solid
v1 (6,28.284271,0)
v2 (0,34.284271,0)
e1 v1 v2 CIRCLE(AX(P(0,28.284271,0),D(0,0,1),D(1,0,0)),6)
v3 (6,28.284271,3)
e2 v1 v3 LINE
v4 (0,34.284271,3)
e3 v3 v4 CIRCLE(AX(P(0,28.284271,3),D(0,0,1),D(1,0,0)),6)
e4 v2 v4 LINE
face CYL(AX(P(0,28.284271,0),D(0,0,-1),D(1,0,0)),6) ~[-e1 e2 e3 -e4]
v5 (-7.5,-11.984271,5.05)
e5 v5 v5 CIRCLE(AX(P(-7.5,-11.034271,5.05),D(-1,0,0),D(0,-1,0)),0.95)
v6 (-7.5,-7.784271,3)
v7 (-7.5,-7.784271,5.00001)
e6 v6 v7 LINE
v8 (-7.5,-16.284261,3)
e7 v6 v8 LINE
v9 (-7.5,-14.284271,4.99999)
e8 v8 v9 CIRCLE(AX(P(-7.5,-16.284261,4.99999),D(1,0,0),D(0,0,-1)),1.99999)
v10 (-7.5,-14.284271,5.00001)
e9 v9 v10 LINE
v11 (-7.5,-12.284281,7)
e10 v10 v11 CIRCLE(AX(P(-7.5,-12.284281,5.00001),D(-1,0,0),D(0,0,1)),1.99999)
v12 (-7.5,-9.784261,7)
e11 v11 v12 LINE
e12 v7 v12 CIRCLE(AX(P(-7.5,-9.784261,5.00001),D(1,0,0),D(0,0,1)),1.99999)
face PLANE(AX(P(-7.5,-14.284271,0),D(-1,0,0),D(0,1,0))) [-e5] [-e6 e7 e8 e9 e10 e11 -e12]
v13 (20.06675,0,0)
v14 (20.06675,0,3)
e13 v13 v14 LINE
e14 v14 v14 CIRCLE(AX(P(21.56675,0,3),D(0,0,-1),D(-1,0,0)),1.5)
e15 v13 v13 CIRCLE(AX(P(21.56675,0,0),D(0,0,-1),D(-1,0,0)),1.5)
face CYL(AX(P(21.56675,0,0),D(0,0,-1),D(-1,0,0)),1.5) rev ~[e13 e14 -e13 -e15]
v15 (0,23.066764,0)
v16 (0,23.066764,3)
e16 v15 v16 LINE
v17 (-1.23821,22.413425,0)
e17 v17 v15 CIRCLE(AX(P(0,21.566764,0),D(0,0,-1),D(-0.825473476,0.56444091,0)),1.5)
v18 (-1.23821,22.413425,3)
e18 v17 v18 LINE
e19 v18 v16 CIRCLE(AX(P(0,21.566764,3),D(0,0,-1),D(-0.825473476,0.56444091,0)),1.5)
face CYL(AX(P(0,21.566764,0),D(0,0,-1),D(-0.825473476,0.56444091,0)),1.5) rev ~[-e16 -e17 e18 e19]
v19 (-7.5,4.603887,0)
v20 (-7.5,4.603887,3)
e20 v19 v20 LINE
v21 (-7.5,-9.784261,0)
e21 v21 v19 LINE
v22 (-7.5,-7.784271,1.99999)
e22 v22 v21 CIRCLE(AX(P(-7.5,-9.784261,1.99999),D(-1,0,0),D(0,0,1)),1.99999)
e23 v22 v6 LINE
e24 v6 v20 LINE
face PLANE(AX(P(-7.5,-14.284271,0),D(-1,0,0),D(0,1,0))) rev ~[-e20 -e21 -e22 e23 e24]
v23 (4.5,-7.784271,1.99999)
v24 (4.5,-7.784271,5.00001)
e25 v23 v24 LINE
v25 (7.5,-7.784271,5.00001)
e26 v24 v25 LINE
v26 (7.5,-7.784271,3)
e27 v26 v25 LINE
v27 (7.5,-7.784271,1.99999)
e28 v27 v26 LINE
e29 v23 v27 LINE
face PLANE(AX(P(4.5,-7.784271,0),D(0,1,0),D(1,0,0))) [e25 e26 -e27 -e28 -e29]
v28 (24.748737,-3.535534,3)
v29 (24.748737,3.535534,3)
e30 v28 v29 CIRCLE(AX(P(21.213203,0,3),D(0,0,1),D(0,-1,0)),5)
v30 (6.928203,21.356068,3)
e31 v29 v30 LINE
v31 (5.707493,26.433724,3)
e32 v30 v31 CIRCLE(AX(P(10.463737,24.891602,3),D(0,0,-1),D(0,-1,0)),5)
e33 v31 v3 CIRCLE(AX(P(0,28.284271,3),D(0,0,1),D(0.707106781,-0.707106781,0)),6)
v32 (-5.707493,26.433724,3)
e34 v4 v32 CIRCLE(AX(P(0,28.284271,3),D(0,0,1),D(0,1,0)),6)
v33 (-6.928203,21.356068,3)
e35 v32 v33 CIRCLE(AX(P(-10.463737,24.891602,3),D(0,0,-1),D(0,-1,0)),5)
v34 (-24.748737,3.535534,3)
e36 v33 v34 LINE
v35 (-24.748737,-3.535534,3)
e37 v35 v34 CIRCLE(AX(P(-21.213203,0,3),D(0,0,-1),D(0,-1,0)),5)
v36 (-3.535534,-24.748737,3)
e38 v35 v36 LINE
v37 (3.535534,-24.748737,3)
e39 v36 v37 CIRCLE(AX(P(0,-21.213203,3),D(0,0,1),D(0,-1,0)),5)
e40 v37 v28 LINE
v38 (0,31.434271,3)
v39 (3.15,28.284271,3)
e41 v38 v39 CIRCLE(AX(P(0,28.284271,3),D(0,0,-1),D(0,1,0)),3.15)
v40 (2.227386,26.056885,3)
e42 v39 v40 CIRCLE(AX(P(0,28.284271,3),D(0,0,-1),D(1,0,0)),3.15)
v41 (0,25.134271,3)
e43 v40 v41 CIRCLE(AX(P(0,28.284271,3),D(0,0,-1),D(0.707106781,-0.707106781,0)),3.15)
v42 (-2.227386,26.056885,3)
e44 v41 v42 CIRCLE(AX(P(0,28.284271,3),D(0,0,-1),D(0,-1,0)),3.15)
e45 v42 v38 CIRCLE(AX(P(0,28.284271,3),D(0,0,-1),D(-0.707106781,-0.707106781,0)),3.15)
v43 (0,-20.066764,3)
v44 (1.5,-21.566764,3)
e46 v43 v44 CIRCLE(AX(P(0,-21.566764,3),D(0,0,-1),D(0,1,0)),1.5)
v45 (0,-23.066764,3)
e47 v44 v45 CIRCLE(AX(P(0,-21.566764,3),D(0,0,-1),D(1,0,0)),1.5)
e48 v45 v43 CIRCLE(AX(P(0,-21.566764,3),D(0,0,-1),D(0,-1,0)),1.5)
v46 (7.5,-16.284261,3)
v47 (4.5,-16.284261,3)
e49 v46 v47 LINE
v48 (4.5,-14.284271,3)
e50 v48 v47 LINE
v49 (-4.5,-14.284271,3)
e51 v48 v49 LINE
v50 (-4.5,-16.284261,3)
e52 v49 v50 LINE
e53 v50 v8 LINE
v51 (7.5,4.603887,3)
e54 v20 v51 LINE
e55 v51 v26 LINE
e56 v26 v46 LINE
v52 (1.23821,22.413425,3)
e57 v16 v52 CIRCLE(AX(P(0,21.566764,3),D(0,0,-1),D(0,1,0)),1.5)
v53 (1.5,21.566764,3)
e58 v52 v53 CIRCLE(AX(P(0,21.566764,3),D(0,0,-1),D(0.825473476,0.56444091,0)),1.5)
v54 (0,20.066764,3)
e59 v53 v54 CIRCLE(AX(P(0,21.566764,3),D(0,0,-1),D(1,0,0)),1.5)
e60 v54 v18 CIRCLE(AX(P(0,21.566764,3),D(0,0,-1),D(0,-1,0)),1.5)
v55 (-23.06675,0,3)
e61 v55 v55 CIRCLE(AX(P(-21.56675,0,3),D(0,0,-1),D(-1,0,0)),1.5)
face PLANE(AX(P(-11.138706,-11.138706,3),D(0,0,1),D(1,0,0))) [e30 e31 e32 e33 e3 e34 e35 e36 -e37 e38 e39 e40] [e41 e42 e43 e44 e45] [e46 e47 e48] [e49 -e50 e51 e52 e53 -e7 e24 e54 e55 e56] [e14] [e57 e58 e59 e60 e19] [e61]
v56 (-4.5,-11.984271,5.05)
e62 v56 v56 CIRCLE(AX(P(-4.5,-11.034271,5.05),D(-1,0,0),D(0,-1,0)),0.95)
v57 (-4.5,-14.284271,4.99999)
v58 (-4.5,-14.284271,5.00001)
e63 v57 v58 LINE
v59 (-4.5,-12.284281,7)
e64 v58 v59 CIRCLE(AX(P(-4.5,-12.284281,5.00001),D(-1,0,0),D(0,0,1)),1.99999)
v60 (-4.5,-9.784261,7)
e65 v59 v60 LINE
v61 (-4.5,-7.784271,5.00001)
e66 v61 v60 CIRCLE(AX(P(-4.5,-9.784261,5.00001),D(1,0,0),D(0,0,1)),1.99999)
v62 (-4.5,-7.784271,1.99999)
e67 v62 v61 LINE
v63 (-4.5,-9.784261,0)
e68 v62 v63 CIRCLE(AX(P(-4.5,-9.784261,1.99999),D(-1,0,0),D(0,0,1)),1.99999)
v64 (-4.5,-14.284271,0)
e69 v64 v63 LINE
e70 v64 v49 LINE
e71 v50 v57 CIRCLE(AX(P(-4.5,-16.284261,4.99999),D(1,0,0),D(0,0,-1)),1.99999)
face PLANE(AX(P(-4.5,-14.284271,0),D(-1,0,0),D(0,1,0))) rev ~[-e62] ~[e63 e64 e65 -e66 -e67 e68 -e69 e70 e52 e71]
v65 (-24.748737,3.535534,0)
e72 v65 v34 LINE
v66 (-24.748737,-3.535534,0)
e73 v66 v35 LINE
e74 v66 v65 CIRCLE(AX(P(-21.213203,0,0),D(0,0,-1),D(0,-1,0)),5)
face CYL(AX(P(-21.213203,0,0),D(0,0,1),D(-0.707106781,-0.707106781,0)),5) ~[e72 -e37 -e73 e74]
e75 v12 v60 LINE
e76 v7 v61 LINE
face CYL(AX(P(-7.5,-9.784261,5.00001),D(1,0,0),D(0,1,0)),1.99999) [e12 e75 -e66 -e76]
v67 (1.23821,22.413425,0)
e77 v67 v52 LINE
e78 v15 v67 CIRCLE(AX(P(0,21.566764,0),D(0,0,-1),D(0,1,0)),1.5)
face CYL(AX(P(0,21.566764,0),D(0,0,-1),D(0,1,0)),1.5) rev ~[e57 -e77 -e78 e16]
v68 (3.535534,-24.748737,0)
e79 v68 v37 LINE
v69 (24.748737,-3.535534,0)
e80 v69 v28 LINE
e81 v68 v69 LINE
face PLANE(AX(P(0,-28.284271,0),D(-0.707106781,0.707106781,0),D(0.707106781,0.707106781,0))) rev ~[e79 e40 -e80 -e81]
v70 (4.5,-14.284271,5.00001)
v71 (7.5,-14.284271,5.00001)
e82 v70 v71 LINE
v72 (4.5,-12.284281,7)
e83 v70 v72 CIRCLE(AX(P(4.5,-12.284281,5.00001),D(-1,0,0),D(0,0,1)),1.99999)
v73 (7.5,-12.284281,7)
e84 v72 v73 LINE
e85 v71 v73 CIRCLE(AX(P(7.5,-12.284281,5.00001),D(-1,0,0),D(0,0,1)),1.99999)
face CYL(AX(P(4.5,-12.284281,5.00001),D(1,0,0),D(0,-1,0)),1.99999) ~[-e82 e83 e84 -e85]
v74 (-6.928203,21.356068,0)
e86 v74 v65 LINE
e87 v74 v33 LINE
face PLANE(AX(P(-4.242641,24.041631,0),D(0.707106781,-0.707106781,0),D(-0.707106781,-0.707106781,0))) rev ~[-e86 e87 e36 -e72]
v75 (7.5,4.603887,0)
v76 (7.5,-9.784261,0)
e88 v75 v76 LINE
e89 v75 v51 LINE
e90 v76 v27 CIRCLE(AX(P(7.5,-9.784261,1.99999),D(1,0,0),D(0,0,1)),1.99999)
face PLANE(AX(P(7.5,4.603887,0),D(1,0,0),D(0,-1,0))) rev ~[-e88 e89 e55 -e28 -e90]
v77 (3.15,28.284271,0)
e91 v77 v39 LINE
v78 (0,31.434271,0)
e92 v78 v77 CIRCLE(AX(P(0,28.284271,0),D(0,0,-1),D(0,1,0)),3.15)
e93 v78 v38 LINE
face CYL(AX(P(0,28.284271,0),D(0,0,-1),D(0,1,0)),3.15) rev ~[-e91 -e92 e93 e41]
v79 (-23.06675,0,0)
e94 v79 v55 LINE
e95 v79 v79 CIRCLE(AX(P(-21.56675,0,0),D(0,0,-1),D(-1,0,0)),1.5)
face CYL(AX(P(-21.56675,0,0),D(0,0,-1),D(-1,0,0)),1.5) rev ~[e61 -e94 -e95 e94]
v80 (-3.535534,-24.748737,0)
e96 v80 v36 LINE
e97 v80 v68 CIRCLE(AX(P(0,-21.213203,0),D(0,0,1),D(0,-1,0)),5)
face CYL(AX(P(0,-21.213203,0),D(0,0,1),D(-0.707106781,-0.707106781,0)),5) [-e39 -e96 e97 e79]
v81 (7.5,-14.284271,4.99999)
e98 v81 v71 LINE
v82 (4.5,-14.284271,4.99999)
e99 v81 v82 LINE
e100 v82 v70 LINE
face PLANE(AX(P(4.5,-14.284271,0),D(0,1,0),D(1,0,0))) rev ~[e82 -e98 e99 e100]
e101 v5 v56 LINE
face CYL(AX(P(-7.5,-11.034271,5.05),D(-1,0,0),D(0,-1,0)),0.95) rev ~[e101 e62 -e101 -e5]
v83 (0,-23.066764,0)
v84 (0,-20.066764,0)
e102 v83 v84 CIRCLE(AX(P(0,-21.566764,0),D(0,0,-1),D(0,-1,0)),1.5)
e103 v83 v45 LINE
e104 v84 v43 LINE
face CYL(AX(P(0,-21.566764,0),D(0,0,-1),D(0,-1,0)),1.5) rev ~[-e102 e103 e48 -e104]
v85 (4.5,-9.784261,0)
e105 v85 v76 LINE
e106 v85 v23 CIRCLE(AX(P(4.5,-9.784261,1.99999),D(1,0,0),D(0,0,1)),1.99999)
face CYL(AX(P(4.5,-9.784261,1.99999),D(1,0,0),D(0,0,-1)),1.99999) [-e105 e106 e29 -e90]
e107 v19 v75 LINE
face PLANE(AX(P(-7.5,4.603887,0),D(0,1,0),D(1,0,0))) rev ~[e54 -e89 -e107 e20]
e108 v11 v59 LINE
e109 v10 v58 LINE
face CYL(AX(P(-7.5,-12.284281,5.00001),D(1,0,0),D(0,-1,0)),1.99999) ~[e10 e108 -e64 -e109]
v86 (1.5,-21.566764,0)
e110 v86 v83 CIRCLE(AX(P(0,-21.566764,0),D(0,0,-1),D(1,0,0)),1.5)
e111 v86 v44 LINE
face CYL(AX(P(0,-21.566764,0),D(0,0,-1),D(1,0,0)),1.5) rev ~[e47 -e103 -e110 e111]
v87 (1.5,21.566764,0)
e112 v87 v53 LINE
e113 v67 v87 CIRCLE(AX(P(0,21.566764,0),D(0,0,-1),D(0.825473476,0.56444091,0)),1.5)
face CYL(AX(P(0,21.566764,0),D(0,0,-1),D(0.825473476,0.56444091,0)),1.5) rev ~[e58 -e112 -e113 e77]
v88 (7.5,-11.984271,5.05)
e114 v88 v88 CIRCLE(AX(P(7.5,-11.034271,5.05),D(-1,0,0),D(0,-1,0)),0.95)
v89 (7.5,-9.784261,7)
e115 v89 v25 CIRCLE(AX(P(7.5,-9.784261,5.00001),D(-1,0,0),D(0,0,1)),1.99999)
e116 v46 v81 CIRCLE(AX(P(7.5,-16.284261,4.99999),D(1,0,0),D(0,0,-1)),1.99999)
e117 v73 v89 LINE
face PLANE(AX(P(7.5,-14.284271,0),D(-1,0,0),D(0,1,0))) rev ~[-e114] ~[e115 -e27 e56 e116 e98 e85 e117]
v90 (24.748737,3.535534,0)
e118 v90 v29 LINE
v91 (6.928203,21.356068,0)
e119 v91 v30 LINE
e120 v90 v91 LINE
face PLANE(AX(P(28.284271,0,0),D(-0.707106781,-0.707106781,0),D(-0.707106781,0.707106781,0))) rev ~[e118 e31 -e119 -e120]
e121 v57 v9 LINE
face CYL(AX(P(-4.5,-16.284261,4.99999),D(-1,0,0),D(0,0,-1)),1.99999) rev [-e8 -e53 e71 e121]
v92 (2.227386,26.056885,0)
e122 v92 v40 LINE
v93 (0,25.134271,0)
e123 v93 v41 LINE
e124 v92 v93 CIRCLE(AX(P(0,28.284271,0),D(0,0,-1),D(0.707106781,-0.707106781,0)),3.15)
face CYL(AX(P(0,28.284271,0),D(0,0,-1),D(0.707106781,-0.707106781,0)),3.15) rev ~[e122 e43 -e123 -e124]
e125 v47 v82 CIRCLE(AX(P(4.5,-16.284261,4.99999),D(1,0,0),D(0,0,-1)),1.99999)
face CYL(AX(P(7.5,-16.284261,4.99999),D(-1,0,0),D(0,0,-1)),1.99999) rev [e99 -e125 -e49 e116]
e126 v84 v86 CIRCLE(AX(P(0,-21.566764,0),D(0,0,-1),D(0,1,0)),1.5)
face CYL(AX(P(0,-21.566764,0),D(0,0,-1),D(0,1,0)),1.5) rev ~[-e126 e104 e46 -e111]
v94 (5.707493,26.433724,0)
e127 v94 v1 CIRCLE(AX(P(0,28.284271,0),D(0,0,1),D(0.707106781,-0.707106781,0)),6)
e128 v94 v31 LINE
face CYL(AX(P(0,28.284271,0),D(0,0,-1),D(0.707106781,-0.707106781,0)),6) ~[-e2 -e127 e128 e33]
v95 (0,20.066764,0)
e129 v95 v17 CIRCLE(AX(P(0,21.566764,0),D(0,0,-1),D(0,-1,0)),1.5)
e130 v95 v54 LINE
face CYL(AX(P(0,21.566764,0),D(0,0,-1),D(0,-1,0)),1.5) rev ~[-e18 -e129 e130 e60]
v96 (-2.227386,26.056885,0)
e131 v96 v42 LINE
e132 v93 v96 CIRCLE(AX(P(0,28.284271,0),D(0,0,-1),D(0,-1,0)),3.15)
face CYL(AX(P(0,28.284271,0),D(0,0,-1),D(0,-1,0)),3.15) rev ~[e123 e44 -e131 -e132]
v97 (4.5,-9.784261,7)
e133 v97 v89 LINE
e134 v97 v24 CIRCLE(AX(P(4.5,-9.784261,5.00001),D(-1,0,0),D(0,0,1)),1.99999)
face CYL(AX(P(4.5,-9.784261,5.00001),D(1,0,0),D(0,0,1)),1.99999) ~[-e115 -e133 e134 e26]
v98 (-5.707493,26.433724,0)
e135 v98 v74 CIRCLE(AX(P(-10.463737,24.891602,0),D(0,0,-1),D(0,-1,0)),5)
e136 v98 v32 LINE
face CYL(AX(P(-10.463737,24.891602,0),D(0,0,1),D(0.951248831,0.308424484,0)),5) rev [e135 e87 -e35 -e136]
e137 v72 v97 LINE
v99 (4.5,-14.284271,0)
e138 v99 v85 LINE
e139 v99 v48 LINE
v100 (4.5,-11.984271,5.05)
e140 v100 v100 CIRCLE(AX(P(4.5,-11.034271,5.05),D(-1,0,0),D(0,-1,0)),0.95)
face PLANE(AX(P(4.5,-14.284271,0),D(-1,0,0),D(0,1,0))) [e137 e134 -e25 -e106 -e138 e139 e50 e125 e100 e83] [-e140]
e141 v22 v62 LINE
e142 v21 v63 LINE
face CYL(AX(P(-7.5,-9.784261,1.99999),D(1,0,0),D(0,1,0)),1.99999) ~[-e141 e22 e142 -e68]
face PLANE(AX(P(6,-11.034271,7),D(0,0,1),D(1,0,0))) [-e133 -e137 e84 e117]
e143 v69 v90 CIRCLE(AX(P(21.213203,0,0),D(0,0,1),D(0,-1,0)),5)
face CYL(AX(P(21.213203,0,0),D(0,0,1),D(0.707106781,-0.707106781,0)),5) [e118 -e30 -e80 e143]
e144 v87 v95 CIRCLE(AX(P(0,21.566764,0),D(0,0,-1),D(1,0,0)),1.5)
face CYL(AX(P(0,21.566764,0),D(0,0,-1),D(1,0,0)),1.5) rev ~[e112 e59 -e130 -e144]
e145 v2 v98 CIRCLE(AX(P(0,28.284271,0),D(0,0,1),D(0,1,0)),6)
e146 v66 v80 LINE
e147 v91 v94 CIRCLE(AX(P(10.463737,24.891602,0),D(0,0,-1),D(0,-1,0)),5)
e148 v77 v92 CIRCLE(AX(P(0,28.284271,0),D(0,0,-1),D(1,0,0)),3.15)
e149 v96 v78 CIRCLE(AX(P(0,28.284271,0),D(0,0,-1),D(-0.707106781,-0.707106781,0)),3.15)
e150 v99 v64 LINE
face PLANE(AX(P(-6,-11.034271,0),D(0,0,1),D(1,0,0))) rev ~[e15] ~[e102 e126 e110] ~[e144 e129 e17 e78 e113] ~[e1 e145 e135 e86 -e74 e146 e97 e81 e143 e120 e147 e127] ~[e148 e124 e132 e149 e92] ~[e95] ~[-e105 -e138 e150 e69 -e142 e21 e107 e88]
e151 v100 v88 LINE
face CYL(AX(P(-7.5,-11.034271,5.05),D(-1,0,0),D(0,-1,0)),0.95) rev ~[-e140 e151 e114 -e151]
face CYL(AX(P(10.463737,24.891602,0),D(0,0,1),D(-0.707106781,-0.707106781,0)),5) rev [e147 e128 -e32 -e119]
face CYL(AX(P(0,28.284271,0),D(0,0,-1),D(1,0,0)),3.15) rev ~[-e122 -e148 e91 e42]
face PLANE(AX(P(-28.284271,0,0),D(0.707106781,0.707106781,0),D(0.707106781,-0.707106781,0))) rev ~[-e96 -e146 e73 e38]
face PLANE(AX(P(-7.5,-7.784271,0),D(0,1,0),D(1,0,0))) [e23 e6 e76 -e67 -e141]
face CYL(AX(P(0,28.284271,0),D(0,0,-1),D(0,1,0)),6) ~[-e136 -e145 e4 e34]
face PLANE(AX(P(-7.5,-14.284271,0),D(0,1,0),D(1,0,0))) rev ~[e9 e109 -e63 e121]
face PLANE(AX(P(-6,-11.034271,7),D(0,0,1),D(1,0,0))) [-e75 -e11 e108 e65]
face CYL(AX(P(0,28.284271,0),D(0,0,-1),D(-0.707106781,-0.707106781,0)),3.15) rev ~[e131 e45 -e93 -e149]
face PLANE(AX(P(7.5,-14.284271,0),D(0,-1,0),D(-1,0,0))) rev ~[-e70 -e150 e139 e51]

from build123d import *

# Parameters (mm, degrees)
F1_DEPTH = 3
F2_R     = 5
F0_W     = 3
F0_H     = 6.5
F3_DEPTH = 7
F4_R     = 0.95
F5_DEPTH = 25
F6_R     = 1.99999


# Not quite as in the source:
# - a fillet or chamfer is up to 0.001 mm smaller than in the source, because OpenCascade refuses the exact size
# - a feature names something its author has since deleted; it is built from what else it names


with BuildPart() as f1:
    # F0 (on Top) → F1 (new body)
    with BuildSketch(Plane.XY):
        with BuildLine():
            Line((-23.06675, 0), (-28.2842712475, 0))
            Line((-28.2842712475, 0), (0, -28.2842712475))
            Line((0, -28.2842712475), (0, -23.0667636524))
            ThreePointArc((0, -23.0667636524), (-1.5, -21.5667636524), (0, -20.0667636524))
            Line((0, -20.0667636524), (0, -14.2842712475))
            Line((0, -14.2842712475), (-4.5, -14.2842712475))
            Line((-4.5, -14.2842712475), (-7.5, -14.2842712475))
            Line((-7.5, -14.2842712475), (-7.5, -7.7842712475))
            Line((-7.5, -7.7842712475), (-7.5, 0))
            Line((-7.5, 0), (-20.06675, 0))
            ThreePointArc((-20.06675, 0), (-21.56675, -1.5), (-23.06675, 0))
        make_face()
        with BuildLine():
            Line((0, -23.0667636524), (0, -28.2842712475))
            Line((0, -28.2842712475), (28.2842712475, 0))
            Line((28.2842712475, 0), (23.06675, 0))
            ThreePointArc((23.06675, 0), (21.56675, -1.5), (20.06675, 0))
            Line((20.06675, 0), (7.5, 0))
            Line((7.5, 0), (7.5, -7.7842712475))
            Line((7.5, -7.7842712475), (7.5, -14.2842712475))
            Line((7.5, -14.2842712475), (4.5, -14.2842712475))
            Line((4.5, -14.2842712475), (0, -14.2842712475))
            Line((0, -14.2842712475), (0, -20.0667636524))
            ThreePointArc((0, -20.0667636524), (1.0606601718, -20.5061034806), (1.5, -21.5667636524))
            ThreePointArc((1.5, -21.5667636524), (1.0606601718, -22.6274238242), (0, -23.0667636524))
        make_face()
        with BuildLine():
            Line((-4.2426406871, 24.0416305603), (-28.2842712475, 0))
            Line((-28.2842712475, 0), (-23.06675, 0))
            ThreePointArc((-23.06675, 0), (-21.56675, 1.5), (-20.06675, 0))
            Line((-20.06675, 0), (-7.5, 0))
            Line((-7.5, 0), (-7.5, 4.6038874425))
            Line((-7.5, 4.6038874425), (0, 4.6038874425))
            Line((0, 4.6038874425), (0, 20.0667636524))
            ThreePointArc((0, 20.0667636524), (-1.3266484173, 20.8667608118), (-1.2382102141, 22.4134250167))
            ThreePointArc((-1.2382102141, 22.4134250167), (-2.8587925726, 23.0091120056), (-4.2426406871, 24.0416305603))
        make_face()
        with BuildLine():
            ThreePointArc((0, 34.2842712475), (-5.5432771951, 30.5803718417), (-4.2426406871, 24.0416305603))
            Line((-4.2426406871, 24.0416305603), (-2.2273863607, 26.0568848867))
            ThreePointArc((-2.2273863607, 26.0568848867), (-2.9102205274, 29.4897240594), (0, 31.4342712475))
            Line((0, 31.4342712475), (0, 34.2842712475))
        make_face()
        with BuildLine():
            Line((-2.2273863607, 26.0568848867), (-4.2426406871, 24.0416305603))
            ThreePointArc((-4.2426406871, 24.0416305603), (-2.8587925726, 23.0091120056), (-1.2382102141, 22.4134250167))
            ThreePointArc((-1.2382102141, 22.4134250167), (-0.7000028406, 22.8934120697), (0, 23.0667636524))
            Line((0, 23.0667636524), (0, 25.1342712475))
            ThreePointArc((0, 25.1342712475), (-1.205452812, 25.3740507201), (-2.2273863607, 26.0568848867))
        make_face()
        with BuildLine():
            ThreePointArc((6, 28.2842712475), (4.2426406871, 32.5269119346), (0, 34.2842712475))
            Line((0, 34.2842712475), (0, 31.4342712475))
            ThreePointArc((0, 31.4342712475), (2.2273863607, 30.5116576082), (3.15, 28.2842712475))
            ThreePointArc((3.15, 28.2842712475), (2.9102205274, 27.0788184355), (2.2273863607, 26.0568848867))
            Line((2.2273863607, 26.0568848867), (4.2426406871, 24.0416305603))
            ThreePointArc((4.2426406871, 24.0416305603), (5.5432771951, 25.9881706533), (6, 28.2842712475))
        make_face()
        with BuildLine():
            ThreePointArc((1.2382102141, 22.4134250167), (2.8587925726, 23.0091120056), (4.2426406871, 24.0416305603))
            Line((4.2426406871, 24.0416305603), (2.2273863607, 26.0568848867))
            ThreePointArc((2.2273863607, 26.0568848867), (1.2054528119, 25.3740507201), (0, 25.1342712475))
            Line((0, 25.1342712475), (0, 23.0667636524))
            ThreePointArc((0, 23.0667636524), (0.7000028406, 22.8934120697), (1.2382102141, 22.4134250167))
        make_face()
        with BuildLine():
            Line((23.06675, 0), (28.2842712475, 0))
            Line((28.2842712475, 0), (4.2426406871, 24.0416305603))
            ThreePointArc((4.2426406871, 24.0416305603), (2.8587925726, 23.0091120056), (1.2382102141, 22.4134250167))
            ThreePointArc((1.2382102141, 22.4134250167), (1.4330588476, 22.0098689891), (1.5, 21.5667636524))
            ThreePointArc((1.5, 21.5667636524), (1.0606601718, 20.5061034806), (0, 20.0667636524))
            Line((0, 20.0667636524), (0, 4.6038874425))
            Line((0, 4.6038874425), (7.5, 4.6038874425))
            Line((7.5, 4.6038874425), (7.5, 0))
            Line((7.5, 0), (20.06675, 0))
            ThreePointArc((20.06675, 0), (21.56675, 1.5), (23.06675, 0))
        make_face()
    extrude(amount=F1_DEPTH)

    # F2
    f2_edges = [f1.edges().sort_by_distance(p)[0] for p in [
        (-28.284271, 0, 1.5),
        (28.284271, 0, 1.5),
        (0, -28.284271, 1.5),
        (4.242641, 24.041631, 1.5),
        (-4.242641, 24.041631, 1.5),
    ]]
    fillet(f2_edges, radius=F2_R)

    # F0 (on Top) → F3 (join)
    with BuildSketch(Plane.XY):
        with Locations((-6, -11.0342712475)):
            Rectangle(F0_W, F0_H)
        with Locations((6, -11.0342712475)):
            Rectangle(F0_W, F0_H)
    extrude(amount=F3_DEPTH)

    # F4 (on face) → F5 (cut)
    with BuildSketch(Plane(origin=(-7.5, 0, 0), x_dir=(0, -1, 0), z_dir=(-1, 0, 0))):
        with Locations((11.0342712475, 5.05)):
            Circle(F4_R)
    extrude(amount=-F5_DEPTH, mode=Mode.SUBTRACT)

    # F6 (radius 2 in the source; OpenCascade refuses exactly that, so slightly less here)
    f6_edges = [f1.edges().sort_by_distance(p)[0] for p in [
        (-6, -14.284271, 7),
        (-6, -14.284271, 3),
        (-6, -7.784271, 7),
        (-6, -7.784271, 0),
        (6, -7.784271, 0),
        (6, -14.284271, 3),
        (6, -14.284271, 7),
        (6, -7.784271, 7),
    ]]
    fillet(f6_edges, radius=F6_R)


solid = f1.part
